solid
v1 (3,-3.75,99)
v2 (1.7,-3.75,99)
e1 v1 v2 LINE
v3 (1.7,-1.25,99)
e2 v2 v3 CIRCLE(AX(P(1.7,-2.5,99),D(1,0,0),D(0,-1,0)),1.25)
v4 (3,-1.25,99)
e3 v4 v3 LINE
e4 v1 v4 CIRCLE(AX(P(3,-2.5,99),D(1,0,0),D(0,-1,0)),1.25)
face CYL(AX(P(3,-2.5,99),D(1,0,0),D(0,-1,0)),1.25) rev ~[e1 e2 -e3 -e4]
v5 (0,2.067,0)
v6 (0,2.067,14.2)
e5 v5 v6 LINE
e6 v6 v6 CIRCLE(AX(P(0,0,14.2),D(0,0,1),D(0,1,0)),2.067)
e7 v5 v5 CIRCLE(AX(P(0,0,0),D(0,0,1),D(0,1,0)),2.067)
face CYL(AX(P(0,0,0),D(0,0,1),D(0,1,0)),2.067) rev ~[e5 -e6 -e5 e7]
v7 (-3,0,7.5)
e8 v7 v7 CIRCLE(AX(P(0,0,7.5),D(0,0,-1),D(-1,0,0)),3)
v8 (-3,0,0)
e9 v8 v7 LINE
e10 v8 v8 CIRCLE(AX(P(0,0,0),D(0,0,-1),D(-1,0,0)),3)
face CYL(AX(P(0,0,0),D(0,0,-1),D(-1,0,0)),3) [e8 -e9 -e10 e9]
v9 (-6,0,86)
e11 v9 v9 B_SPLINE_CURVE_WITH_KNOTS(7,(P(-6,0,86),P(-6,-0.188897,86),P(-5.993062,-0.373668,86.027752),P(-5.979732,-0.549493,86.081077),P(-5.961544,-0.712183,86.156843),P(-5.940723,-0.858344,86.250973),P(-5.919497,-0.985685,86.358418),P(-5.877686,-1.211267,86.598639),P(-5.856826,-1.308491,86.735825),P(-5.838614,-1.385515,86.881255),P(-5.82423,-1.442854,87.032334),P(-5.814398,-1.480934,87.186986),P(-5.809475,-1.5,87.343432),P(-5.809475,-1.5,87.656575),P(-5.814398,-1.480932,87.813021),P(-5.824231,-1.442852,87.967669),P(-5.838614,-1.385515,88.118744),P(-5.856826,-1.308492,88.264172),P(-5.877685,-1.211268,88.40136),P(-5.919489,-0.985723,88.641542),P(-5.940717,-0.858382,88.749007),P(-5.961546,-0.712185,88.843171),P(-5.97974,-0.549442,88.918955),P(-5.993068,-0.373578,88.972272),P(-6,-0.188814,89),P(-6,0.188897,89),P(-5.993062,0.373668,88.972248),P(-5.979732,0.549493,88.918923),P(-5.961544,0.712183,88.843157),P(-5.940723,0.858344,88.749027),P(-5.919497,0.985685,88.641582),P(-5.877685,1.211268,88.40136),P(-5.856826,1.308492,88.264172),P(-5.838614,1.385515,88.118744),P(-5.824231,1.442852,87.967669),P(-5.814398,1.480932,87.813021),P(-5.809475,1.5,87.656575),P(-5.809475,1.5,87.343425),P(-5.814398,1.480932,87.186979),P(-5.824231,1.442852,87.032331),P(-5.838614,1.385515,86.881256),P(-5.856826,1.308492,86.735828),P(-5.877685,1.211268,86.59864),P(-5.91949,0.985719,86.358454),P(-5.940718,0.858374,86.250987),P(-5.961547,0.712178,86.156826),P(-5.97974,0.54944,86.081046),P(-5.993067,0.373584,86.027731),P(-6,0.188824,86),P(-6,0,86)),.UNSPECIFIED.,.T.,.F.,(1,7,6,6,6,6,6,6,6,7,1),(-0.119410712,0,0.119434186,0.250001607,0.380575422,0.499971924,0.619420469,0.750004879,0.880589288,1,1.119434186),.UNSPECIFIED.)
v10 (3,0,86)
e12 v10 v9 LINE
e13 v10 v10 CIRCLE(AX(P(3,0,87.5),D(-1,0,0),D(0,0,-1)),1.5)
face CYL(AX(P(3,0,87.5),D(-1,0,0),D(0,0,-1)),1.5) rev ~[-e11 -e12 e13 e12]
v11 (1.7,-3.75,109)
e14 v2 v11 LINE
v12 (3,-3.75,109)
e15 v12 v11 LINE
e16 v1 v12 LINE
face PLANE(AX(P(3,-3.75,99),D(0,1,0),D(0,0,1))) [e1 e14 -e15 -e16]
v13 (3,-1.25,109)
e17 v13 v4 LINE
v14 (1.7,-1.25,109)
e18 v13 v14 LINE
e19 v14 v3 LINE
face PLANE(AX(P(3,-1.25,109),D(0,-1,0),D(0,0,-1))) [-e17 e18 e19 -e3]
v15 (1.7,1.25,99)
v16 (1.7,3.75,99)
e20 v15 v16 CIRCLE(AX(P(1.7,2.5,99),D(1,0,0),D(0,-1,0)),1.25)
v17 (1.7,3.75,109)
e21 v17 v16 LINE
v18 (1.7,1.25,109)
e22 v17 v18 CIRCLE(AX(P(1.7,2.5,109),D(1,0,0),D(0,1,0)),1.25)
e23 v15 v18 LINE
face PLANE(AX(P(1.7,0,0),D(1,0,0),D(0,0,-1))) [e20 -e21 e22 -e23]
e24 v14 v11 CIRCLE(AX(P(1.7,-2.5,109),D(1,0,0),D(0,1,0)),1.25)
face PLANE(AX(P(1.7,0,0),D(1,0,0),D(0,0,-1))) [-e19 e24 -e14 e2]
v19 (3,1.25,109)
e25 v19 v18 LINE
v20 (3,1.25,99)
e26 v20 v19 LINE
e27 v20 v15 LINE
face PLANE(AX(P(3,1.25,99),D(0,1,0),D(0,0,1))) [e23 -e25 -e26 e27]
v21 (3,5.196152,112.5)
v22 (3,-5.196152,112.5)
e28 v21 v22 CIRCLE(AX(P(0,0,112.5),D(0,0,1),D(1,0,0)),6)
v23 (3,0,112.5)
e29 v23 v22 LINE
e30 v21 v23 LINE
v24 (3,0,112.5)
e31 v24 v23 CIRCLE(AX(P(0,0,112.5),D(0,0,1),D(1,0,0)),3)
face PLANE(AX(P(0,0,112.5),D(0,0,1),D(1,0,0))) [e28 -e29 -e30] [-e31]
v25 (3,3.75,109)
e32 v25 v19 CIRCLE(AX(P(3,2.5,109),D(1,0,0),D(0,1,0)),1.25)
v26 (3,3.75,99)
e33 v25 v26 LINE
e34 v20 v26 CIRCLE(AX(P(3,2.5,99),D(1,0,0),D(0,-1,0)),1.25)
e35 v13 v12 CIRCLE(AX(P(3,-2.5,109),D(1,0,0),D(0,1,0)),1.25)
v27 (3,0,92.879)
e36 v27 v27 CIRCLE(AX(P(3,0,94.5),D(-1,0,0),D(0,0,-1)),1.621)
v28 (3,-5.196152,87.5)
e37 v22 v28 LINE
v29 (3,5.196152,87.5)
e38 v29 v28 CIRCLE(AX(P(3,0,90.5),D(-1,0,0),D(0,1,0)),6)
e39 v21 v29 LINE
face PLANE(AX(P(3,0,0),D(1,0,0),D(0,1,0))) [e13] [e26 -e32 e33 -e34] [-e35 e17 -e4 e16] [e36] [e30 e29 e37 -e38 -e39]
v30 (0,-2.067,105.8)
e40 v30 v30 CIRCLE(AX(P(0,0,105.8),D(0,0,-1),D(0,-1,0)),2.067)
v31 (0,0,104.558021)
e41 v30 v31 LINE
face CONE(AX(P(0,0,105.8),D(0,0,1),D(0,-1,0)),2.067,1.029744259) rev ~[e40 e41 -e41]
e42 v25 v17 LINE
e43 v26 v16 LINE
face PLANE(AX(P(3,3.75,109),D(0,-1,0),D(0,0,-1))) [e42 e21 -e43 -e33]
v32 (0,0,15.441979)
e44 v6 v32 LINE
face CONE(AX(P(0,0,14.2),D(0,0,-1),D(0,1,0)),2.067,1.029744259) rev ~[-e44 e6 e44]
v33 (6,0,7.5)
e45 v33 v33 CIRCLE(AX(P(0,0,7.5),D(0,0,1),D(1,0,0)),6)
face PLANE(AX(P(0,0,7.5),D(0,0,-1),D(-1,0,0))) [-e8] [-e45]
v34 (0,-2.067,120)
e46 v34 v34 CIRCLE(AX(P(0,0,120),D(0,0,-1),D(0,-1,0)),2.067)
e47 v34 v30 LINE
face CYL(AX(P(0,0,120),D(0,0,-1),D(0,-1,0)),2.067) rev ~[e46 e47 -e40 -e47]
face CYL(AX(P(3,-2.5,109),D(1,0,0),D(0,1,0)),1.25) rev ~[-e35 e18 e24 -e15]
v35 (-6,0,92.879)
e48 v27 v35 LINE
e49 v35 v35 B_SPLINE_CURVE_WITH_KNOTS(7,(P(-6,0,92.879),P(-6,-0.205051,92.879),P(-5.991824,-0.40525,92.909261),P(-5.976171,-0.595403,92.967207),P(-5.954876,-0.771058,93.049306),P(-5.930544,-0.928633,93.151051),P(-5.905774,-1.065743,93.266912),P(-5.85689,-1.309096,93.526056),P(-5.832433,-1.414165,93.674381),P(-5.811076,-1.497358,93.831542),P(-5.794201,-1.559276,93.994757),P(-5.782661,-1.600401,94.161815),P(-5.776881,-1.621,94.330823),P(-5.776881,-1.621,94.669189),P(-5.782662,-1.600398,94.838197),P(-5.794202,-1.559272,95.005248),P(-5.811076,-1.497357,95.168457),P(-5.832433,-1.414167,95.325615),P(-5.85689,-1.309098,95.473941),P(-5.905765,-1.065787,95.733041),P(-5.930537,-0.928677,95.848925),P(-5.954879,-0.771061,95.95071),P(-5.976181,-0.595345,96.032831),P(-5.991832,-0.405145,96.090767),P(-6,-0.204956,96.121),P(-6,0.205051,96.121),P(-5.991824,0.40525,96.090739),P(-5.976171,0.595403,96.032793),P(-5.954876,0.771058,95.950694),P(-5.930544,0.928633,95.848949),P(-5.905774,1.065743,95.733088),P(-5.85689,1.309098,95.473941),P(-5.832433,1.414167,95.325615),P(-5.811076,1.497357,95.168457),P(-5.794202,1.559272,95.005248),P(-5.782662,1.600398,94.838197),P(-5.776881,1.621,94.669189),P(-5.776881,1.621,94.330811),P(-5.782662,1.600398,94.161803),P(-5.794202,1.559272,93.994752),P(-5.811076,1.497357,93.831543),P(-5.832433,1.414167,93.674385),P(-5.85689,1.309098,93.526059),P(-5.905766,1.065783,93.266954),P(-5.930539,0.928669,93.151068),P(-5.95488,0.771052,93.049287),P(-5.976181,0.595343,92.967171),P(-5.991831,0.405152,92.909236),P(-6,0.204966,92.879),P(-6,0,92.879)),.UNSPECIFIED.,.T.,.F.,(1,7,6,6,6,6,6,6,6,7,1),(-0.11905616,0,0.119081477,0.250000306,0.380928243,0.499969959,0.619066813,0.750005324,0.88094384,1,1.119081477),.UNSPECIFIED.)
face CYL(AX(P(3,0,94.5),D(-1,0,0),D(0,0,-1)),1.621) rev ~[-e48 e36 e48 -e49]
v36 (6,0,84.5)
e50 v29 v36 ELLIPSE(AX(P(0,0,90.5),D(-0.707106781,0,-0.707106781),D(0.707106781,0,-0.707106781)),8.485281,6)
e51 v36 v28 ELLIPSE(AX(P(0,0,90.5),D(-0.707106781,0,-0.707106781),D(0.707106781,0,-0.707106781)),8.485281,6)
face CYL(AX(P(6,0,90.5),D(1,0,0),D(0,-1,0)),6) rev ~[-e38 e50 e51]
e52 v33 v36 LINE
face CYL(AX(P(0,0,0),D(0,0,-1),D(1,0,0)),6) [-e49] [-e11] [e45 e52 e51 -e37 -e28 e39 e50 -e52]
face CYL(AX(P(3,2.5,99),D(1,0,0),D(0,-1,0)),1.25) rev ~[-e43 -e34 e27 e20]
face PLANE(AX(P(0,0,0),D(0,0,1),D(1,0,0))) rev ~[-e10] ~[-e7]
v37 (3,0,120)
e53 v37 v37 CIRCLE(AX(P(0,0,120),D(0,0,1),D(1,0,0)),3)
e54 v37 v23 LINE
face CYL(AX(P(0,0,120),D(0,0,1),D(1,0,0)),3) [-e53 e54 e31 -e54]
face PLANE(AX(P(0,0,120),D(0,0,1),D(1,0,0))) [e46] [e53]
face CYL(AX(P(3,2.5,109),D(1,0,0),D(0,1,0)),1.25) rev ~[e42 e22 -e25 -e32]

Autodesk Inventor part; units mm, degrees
ref_plane "XZ Plane" through (0, 0, 0) normal (0, 1, 0) x (-1, 0, 0)
ref_plane "XY Plane" through (0, 0, 0) normal (0, 0, 1) x (1, 0, 0)
sketch "Skizze1" plane through (0, 0, 0) normal (0, 0, 1) x (1, 0, 0)
  line L0 (-8.4, 0) -> (8.4, 0) projected
  line L1 (0, -8.4) -> (0, 8.4) projected
  circle A0 centre (0, 0) radius 6
  dimension "d0" = 12
extrude "Extrusion1" add sketch "Skizze1" along normal blind 120
sketch "Skizze2" plane through (0, 0, 120) normal (0, 0, 1) x (1, 0, 0)
  circle A0 centre (0, 0) radius 6 projected
  circle A1 centre (0, 0) radius 3
  dimension "d3" = 6
extrude "Extrusion2" cut sketch "Skizze2" against normal blind 7.5
sketch "Skizze3" plane through (0, 0, 0) normal (0, 0, -1) x (-1, 0, 0)
  circle A0 centre (0, 0) radius 6 projected
  circle A1 centre (0, 0) radius 3
  circle A2 centre (0, 0) radius 3 projected
extrude "Extrusion3" cut sketch "Skizze3" against normal blind 7.5
sketch "Skizze4" plane through (0, 0, 0) normal (0, 0, -1) x (-1, 0, 0)
  circle A0 centre (0, 0) radius 3 projected
hole "Bohrung1" at (0, 0, 0) direction (0, 0, 1) diameter 4.134 depth 14.2 tip angle 118 thread size "M5x0.8" class "6H" standard "ISO Metric profile"
sketch "Skizze5" plane through (0, 0, 120) normal (0, 0, 1) x (1, 0, 0)
  point P0 (0, 0)
  point P1 (0, 0)
hole "Bohrung2" at (0, 0, 120) direction (0, 0, -1) diameter 4.134 depth 14.2 tip angle 118 thread size "M5x0.8" class "6H" standard "ISO Metric profile"
ref_plane "Arbeitsebene1" through (6, 0, 0) normal (1, 0, 0) x (0, 1, 0)
sketch "Skizze7" plane through (6, 0, 0) normal (1, 0, 0) x (0, 1, 0)
  line L0 (-6, 112.5) -> (6, 112.5) projected
  line L1 (-6, 7.5) -> (-6, 112.5) projected
  line L2 (6, 7.5) -> (6, 112.5) projected
  line L3 (-6, 112.5) -> (6, 112.5)
  line L4 (6, 112.5) -> (6, 90.5)
  line L5 (6, 90.5) -> (-6, 90.5)
  line L6 (-6, 90.5) -> (-6, 112.5)
  arc A0 (-6, 90.5) -> (6, 90.5) centre (0, 90.5) ccw
  line L7 (-8.4, 0) -> (8.4, 0) projected
  line L8 (0, -24) -> (0, 144) projected
  point P0 (0, 0)
  dimension "d22" = 22
extrude "Extrusion4" cut sketch "Skizze7" against normal blind 3
sketch "Skizze8" plane through (3, 0, 0) normal (1, 0, 0) x (0, 0, -1)
  line L0 (0, -8.4) -> (0, 8.4) projected
  line L1 (24, 0) -> (-144, 0) projected
  line L2 (-109, -2.5) -> (-99, -2.5) construction
  line L3 (-87.5, -5.1962) -> (-112.5, -5.1962) projected
  line L4 (-99, 2.5) -> (-109, 2.5) construction
  line L5 (-109, -2.5) -> (-99, -2.5) construction
  line L6 (-109, -1.25) -> (-99, -1.25)
  line L7 (-99, -3.75) -> (-109, -3.75)
  arc A0 (-109, -1.25) -> (-109, -3.75) centre (-109, -2.5) ccw
  arc A1 (-99, -3.75) -> (-99, -1.25) centre (-99, -2.5) ccw
  line L8 (-109, 2.5) -> (-99, 2.5) construction
  line L9 (-109, 3.75) -> (-99, 3.75)
  line L10 (-99, 1.25) -> (-109, 1.25)
  arc A2 (-109, 3.75) -> (-109, 1.25) centre (-109, 2.5) ccw
  arc A3 (-99, 1.25) -> (-99, 3.75) centre (-99, 2.5) ccw
  line L11 (-112.5, 0) -> (-112.5, 5.1962) projected
  line L12 (-112.5, -5.1962) -> (-112.5, 0) projected
  point P0 (0, 0)
  point P1 (-104, -2.5)
  point P2 (-104, 2.5)
  dimension "d25" = 5
  dimension "d26" = 2.5
  dimension "d27" = 2.5
  dimension "d28" = 3.5
  dimension "d29" = 3.5
  dimension "d30" = 10
  dimension "d31" = 10
extrude "Extrusion5" cut sketch "Skizze8" against normal blind 1.3
sketch "Skizze9" plane through (3, 0, 0) normal (1, 0, 0) x (0, 0, -1)
  line L0 (24, 0) -> (-144, 0) projected
  line L1 (0, -8.4) -> (0, 8.4) projected
  line L2 (-112.5, -5.1962) -> (-112.5, 0) projected
  point P0 (0, 0)
  point P1 (-94.5, 0)
  dimension "d34" = 18
hole "Bohrung3" at (3, 0, 94.5) direction (-1, 0, 0) diameter 3.242 depth 11.8 tip angle 118 thread size "M4x0.7" class "6H" standard "ISO Metric profile"
sketch "Skizze10" plane through (3, 0, 0) normal (1, 0, 0) x (0, 0, -1)
  line L0 (24, 0) -> (-144, 0) projected
  line L1 (0, -8.4) -> (0, 8.4) projected
  circle A0 centre (-94.5, 0) radius 1.621 projected
  point P0 (0, 0)
  point P1 (-87.5, 0)
  dimension "d42" = 7
hole "Bohrung4" at (3, 0, 87.5) direction (-1, 0, 0) diameter 3 end through all
equation "\"d27\" = d26"
equation "\"d29\" = d28"
equation "\"d31\" = d30"
properties part number "24_0497_004"
